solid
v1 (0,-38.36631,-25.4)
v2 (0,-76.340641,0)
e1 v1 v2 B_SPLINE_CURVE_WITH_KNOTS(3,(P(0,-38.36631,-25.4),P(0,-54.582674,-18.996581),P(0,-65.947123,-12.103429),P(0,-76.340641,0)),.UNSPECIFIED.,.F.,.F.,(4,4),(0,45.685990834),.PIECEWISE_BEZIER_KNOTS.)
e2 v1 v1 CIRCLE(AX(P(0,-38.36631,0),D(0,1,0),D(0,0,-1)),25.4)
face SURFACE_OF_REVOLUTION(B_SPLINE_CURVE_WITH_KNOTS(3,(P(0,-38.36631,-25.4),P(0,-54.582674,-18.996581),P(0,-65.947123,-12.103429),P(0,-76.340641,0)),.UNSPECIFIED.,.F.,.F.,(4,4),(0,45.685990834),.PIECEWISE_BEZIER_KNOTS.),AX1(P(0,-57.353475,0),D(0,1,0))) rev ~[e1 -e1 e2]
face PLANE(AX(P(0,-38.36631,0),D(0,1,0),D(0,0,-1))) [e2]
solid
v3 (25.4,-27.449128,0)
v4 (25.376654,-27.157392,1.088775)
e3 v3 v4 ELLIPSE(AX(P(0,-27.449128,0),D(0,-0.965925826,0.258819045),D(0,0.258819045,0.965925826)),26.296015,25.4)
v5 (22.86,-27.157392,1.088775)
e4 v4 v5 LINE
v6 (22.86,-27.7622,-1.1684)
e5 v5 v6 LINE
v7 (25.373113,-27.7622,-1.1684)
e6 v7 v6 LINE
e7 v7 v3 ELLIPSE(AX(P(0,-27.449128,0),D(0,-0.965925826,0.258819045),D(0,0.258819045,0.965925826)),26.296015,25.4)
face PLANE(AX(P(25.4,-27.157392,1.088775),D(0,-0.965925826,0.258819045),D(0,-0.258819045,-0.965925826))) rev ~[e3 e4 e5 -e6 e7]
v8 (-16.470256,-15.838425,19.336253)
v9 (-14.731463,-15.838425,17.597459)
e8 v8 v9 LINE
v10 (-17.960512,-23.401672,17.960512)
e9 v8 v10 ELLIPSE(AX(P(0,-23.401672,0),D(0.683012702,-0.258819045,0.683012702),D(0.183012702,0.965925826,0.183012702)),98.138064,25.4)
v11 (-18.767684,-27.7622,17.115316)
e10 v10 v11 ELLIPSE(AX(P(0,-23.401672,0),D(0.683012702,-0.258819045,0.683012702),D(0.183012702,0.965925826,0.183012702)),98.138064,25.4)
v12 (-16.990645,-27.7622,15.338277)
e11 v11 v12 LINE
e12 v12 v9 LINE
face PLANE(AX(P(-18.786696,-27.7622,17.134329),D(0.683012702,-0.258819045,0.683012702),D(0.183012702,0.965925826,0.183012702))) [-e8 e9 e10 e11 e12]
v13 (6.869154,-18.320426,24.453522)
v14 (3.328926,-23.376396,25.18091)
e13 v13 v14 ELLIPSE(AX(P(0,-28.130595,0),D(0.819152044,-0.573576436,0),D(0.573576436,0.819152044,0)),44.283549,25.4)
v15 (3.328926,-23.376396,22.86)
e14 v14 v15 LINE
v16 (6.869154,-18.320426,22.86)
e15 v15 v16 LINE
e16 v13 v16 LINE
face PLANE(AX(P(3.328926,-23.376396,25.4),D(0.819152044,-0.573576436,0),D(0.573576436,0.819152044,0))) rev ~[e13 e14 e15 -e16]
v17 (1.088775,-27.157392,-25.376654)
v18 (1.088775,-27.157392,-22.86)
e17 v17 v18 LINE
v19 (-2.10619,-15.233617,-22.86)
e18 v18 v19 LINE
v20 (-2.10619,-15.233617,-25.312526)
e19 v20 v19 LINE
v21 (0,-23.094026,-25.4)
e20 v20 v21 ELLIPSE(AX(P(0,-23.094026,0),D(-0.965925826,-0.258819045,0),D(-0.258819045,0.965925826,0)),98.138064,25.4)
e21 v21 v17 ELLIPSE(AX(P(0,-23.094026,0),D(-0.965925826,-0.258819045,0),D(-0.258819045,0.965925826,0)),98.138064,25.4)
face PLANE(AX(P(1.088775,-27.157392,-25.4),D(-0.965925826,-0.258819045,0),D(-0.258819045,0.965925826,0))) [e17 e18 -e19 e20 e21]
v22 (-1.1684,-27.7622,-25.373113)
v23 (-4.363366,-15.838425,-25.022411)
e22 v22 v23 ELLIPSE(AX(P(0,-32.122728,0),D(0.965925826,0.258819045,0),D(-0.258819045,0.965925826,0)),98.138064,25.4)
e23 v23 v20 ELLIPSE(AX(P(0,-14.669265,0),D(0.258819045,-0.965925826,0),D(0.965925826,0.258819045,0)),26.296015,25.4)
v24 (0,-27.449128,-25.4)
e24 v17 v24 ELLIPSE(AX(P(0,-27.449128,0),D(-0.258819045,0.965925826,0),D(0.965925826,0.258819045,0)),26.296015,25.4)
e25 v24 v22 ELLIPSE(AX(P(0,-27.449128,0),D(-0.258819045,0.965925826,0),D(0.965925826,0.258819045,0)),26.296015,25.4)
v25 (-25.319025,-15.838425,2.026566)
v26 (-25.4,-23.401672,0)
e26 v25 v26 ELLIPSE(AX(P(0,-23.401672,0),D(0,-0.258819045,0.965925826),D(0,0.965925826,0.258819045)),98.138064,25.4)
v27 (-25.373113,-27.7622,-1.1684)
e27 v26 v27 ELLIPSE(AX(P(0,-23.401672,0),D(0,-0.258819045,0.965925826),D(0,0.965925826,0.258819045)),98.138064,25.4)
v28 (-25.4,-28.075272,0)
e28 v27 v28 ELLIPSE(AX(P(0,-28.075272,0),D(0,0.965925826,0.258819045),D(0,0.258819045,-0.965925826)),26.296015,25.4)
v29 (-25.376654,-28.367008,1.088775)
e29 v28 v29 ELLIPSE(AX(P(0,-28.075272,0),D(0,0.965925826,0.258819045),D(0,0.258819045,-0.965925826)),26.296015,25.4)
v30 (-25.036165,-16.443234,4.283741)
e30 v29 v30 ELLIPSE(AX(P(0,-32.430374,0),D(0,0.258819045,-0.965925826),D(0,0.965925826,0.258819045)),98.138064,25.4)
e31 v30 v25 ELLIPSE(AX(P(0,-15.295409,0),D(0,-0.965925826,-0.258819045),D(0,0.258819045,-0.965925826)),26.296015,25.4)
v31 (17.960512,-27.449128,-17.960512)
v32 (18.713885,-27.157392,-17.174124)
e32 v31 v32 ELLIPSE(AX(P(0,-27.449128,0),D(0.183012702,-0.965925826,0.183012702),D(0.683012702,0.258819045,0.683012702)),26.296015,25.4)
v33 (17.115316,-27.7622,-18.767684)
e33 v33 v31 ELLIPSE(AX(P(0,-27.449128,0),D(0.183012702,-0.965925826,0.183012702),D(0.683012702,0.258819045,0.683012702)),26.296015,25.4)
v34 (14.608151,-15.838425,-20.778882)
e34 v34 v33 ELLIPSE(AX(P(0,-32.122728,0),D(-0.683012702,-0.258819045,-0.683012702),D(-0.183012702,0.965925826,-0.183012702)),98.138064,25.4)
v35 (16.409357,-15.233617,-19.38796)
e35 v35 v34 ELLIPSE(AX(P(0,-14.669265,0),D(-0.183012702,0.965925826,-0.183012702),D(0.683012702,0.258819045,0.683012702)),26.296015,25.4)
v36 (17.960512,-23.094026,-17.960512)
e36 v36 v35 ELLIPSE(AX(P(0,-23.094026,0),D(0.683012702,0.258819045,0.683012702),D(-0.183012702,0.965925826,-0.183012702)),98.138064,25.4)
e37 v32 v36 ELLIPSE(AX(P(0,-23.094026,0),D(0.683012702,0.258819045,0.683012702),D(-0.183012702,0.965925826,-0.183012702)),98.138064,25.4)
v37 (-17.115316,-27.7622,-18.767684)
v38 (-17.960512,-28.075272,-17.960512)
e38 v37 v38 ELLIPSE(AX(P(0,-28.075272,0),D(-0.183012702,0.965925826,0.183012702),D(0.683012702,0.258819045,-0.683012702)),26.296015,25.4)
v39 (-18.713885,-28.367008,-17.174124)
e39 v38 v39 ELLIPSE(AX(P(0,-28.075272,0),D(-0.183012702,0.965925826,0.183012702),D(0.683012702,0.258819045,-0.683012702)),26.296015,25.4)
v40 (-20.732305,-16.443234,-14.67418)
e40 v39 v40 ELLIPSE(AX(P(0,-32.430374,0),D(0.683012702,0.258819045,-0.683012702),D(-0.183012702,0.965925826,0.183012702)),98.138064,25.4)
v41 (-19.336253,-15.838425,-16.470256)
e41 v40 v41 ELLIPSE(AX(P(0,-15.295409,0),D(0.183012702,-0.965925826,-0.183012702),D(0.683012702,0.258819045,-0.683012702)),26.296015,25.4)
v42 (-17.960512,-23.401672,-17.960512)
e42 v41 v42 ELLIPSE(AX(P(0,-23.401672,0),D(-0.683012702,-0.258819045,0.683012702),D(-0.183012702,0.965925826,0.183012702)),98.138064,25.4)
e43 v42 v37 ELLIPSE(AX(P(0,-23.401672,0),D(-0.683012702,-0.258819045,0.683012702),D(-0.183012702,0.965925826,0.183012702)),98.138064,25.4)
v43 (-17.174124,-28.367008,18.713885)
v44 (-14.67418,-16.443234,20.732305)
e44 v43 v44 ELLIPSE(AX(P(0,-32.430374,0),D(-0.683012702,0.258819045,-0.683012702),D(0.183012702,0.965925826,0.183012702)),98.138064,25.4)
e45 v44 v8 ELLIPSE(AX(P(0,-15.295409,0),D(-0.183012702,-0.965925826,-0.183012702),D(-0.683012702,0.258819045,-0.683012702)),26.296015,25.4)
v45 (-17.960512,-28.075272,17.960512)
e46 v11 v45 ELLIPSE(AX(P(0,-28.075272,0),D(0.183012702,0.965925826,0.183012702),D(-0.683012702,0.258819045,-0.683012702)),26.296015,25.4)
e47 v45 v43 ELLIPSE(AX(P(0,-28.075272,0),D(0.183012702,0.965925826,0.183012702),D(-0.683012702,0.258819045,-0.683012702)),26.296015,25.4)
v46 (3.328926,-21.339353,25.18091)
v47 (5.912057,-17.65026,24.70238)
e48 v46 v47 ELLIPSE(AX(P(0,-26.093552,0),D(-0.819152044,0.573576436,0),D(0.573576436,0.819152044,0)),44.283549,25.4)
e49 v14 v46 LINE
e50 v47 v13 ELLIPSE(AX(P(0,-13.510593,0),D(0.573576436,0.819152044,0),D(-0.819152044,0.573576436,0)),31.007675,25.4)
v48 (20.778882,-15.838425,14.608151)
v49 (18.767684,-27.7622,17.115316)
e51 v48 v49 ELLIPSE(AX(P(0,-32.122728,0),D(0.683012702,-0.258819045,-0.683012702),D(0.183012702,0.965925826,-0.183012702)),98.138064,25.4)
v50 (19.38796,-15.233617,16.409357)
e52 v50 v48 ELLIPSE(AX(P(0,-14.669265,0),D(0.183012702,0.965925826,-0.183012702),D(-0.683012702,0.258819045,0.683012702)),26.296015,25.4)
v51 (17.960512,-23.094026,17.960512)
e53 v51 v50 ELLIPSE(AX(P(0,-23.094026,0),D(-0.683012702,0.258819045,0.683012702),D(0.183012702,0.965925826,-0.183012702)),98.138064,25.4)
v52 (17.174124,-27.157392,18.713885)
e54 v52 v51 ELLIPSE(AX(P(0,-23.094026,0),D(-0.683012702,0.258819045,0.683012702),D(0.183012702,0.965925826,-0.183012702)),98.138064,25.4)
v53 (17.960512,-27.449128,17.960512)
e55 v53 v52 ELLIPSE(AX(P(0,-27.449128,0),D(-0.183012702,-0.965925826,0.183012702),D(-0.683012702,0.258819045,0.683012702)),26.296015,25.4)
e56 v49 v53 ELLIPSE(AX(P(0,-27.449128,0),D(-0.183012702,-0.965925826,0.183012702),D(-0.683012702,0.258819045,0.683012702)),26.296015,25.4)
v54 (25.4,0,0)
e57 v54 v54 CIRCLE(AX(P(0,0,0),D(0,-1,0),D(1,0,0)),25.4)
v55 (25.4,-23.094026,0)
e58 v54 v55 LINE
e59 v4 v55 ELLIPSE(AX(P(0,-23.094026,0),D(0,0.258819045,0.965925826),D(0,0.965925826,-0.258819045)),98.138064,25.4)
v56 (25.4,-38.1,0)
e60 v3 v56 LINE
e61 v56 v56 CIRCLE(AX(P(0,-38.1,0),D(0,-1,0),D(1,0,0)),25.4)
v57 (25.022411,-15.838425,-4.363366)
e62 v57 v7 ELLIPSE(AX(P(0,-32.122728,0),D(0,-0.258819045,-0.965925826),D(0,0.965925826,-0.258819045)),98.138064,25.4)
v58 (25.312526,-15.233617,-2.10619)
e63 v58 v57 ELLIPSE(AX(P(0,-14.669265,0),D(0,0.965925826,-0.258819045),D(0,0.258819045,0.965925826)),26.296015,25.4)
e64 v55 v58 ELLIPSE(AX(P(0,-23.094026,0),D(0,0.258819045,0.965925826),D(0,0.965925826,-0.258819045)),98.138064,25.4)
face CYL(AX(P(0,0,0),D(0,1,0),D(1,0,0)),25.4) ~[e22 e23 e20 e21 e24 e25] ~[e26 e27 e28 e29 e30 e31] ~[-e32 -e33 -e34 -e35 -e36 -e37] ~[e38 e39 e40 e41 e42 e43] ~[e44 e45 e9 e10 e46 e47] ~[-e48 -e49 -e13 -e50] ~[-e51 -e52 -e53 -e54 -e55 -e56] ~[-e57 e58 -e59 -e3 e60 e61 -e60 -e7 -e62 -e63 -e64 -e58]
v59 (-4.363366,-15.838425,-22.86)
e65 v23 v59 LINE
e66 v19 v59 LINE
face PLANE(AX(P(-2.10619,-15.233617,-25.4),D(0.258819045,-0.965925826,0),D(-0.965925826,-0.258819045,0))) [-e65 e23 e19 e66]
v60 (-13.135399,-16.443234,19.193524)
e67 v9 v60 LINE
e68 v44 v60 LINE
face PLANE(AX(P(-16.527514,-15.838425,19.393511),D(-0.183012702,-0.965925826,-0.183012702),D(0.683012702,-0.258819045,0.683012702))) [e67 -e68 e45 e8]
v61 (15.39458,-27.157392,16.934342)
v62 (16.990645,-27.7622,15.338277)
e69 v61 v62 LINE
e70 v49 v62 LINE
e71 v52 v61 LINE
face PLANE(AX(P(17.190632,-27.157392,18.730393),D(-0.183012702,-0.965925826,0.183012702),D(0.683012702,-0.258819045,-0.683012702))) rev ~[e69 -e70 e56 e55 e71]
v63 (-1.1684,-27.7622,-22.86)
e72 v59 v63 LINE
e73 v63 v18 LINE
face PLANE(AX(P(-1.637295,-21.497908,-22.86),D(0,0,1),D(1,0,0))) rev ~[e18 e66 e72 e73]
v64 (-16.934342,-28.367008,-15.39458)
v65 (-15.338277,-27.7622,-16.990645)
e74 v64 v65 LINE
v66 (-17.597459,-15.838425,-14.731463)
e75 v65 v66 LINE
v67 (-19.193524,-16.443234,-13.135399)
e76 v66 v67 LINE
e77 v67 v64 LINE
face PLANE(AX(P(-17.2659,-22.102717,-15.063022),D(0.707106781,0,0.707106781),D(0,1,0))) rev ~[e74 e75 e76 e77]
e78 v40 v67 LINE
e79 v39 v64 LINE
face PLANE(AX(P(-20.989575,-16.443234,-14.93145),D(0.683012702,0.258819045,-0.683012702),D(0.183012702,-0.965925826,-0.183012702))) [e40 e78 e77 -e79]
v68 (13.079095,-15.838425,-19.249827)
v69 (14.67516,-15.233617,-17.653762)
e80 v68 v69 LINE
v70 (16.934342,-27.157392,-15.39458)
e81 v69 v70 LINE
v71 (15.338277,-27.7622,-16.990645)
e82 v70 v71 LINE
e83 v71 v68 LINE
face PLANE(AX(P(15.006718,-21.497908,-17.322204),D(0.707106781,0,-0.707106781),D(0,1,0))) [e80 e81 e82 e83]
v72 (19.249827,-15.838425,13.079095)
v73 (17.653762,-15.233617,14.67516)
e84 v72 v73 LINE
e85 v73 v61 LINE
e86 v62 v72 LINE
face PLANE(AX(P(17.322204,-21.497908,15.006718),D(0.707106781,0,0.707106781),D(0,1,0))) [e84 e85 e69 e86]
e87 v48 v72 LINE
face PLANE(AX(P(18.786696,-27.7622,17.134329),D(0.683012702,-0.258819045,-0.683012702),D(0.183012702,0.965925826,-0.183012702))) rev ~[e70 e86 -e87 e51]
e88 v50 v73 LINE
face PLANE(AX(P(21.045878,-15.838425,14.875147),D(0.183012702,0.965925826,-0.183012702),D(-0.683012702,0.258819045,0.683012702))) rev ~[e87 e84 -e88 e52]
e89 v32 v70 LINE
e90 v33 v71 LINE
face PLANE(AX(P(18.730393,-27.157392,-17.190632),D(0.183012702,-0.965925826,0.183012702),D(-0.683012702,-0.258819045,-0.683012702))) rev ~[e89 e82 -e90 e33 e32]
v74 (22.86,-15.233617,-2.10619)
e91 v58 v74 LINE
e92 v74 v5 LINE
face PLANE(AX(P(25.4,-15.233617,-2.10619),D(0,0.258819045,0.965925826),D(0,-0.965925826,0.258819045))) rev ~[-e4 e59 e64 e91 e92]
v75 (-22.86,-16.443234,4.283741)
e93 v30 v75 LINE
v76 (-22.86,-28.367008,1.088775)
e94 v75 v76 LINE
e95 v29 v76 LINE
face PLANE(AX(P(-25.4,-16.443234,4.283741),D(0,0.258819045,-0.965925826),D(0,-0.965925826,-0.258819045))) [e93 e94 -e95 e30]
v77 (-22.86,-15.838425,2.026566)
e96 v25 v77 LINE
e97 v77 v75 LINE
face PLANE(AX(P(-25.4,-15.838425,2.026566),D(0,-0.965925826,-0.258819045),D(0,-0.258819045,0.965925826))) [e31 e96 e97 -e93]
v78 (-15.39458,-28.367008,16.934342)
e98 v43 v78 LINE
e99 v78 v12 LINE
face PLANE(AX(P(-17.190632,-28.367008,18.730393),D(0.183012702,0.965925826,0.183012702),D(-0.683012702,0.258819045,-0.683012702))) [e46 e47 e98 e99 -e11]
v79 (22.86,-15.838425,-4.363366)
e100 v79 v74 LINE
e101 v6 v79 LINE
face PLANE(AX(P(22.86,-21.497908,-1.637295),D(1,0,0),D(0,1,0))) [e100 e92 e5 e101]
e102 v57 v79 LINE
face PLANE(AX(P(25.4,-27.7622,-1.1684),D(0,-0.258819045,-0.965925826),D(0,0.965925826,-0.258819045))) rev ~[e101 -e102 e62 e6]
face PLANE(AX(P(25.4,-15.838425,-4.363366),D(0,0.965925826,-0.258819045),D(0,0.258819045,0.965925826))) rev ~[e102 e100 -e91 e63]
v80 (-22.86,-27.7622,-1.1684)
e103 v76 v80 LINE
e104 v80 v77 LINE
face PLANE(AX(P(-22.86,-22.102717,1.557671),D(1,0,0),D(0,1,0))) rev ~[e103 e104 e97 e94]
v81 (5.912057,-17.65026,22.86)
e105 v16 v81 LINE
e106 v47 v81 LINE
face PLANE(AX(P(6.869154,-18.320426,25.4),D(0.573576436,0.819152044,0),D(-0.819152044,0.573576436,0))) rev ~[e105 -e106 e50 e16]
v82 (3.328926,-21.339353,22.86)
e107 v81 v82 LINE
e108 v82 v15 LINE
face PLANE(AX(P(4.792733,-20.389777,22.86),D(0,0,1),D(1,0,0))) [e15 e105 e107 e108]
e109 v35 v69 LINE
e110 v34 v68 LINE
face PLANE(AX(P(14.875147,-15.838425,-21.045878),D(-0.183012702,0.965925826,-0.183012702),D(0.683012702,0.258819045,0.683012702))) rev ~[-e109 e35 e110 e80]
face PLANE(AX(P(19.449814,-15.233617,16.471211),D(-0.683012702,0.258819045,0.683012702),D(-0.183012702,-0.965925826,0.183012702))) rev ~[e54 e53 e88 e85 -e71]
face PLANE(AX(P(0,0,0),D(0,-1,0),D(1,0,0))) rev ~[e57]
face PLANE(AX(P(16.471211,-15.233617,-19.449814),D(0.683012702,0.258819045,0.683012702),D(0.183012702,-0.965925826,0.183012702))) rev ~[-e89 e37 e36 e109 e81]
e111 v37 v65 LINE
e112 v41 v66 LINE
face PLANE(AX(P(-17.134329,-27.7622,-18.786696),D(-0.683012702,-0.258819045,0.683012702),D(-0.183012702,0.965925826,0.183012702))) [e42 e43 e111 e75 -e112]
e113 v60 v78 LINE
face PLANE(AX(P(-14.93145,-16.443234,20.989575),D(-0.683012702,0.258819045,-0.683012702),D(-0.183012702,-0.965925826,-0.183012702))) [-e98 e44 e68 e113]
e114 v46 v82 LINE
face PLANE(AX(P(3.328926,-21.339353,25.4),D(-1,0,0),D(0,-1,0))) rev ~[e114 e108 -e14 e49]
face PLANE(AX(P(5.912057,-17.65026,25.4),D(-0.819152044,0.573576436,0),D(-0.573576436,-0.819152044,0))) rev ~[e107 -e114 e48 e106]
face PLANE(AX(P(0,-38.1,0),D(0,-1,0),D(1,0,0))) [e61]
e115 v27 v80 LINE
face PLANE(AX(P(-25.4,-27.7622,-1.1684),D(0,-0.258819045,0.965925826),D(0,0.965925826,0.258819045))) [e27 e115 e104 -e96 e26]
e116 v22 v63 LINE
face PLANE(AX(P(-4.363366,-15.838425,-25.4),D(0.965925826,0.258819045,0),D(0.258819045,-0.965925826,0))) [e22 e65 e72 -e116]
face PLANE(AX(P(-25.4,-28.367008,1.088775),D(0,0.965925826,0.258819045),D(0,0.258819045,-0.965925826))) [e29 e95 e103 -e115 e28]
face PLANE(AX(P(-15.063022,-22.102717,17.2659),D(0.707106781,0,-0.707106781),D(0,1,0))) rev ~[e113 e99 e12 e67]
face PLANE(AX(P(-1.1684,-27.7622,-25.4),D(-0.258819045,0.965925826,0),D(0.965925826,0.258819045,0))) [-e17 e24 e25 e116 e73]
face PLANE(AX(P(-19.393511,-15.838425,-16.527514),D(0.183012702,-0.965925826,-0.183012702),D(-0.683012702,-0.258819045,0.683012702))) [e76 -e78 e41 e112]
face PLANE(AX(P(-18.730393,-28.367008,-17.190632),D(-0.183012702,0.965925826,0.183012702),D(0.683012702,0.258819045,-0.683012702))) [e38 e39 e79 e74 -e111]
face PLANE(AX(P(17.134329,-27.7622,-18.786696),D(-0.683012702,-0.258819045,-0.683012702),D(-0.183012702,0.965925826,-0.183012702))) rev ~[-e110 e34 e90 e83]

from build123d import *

# Parameters (mm, degrees)
F0_R      = 25.4
F1_DEPTH  = 38.1
F22_DEPTH = 2.54
F23_DEPTH = 2.54
F24_DEPTH = 2.54
F25_DEPTH = 2.54
F26_DEPTH = 2.54
F27_DEPTH = 2.54
F28_DEPTH = 2.54
F29_DEPTH = 2.54


with BuildPart() as f1:
    # F0 (on Front) → F1 (new body)
    with BuildSketch(Plane.XZ):
        Circle(F0_R)
    extrude(amount=F1_DEPTH)

    # F16 (on offset) → F22 (cut)
    with BuildSketch(Plane.YZ.offset(-25.4)):
        Polygon((-27.7622, -1.1684), (-15.83842523, 2.0265658204), (-16.4432335746, 4.2837412912), (-28.3670083446, 1.0887754709), align=None)
    extrude(amount=F22_DEPTH, mode=Mode.SUBTRACT)

    # F15 (on face) → F23 (cut)
    with BuildSketch(Plane(origin=(-17.9605122421, 0, 17.9605122421), x_dir=(0, 1, 0), z_dir=(0.7071067812, 0, -0.7071067812))):
        Polygon((-27.7622, -1.1684), (-15.83842523, 2.0265658204), (-16.4432335746, 4.2837412912), (-28.3670083446, 1.0887754709), align=None)
    extrude(amount=F23_DEPTH, mode=Mode.SUBTRACT)

    # F21 (on offset) → F24 (cut)
    with BuildSketch(Plane.XY.offset(25.4)):
        Polygon((5.9120569609, -17.6502595045), (3.328925729, -21.3393532245), (3.328925729, -23.3763964605), (6.8691542094, -18.3204262127), align=None)
    extrude(amount=-F24_DEPTH, mode=Mode.SUBTRACT)

    # F14 (on face) → F25 (cut)
    with BuildSketch(Plane(origin=(17.9605122421, 0, 17.9605122421), x_dir=(0, 1, 0), z_dir=(0.7071067812, 0, 0.7071067812))):
        Polygon((-27.7622, -1.1684), (-15.83842523, -4.3633658204), (-15.2336168854, -2.1061903495), (-27.1573916554, 1.0887754709), align=None)
    extrude(amount=-F25_DEPTH, mode=Mode.SUBTRACT)

    # F20 (on offset) → F26 (cut)
    with BuildSketch(Plane.YZ.offset(25.4)):
        Polygon((-27.7622, -1.1684), (-15.83842523, -4.3633658204), (-15.2336168854, -2.1061903495), (-27.1573916554, 1.0887754709), align=None)
    extrude(amount=-F26_DEPTH, mode=Mode.SUBTRACT)

    # F19 (on face) → F27 (cut)
    with BuildSketch(Plane(origin=(17.9605122421, 0, -17.9605122421), x_dir=(0, 1, 0), z_dir=(0.7071067812, 0, -0.7071067812))):
        Polygon((-27.7622, -1.1684), (-15.83842523, -4.3633658204), (-15.2336168854, -2.1061903495), (-27.1573916554, 1.0887754709), align=None)
    extrude(amount=-F27_DEPTH, mode=Mode.SUBTRACT)

    # F18 (on offset) → F28 (cut)
    with BuildSketch(Plane.XY.offset(-25.4)):
        Polygon((-4.3633658204, -15.83842523), (-1.1684, -27.7622), (1.0887754709, -27.1573916554), (-2.1061903495, -15.2336168854), align=None)
    extrude(amount=F28_DEPTH, mode=Mode.SUBTRACT)

    # F17 (on face) → F29 (cut)
    with BuildSketch(Plane(origin=(-17.9605122421, 0, -17.9605122421), x_dir=(0, 1, 0), z_dir=(0.7071067812, 0, 0.7071067812))):
        Polygon((-27.7622, -1.1684), (-15.83842523, 2.0265658204), (-16.4432335746, 4.2837412912), (-28.3670083446, 1.0887754709), align=None)
    extrude(amount=F29_DEPTH, mode=Mode.SUBTRACT)


with BuildPart() as f3:
    # F2 (on Right) → F3 (revolve)
    with BuildSketch(Plane.YZ):
        with BuildLine():
            Line((-38.3663102984, 0), (-76.3406405559, 0))
            add(Edge.make_bspline(
                [(-38.3663102984, -25.4), (-54.5826740563, -18.9965814352), (-65.9471228719, -12.1034290642), (-76.3406405559, 0)],
                knots=[0, 0, 0, 0, 45.6859908342, 45.6859908342, 45.6859908342, 45.6859908342], degree=3))
            Line((-38.3663102984, -25.4), (-38.3663102984, 0))
        make_face()
    revolve(axis=Axis((0, -57.3534754272, 0), (0, 1, 0)))


solid = Compound([f1.part, f3.part])
